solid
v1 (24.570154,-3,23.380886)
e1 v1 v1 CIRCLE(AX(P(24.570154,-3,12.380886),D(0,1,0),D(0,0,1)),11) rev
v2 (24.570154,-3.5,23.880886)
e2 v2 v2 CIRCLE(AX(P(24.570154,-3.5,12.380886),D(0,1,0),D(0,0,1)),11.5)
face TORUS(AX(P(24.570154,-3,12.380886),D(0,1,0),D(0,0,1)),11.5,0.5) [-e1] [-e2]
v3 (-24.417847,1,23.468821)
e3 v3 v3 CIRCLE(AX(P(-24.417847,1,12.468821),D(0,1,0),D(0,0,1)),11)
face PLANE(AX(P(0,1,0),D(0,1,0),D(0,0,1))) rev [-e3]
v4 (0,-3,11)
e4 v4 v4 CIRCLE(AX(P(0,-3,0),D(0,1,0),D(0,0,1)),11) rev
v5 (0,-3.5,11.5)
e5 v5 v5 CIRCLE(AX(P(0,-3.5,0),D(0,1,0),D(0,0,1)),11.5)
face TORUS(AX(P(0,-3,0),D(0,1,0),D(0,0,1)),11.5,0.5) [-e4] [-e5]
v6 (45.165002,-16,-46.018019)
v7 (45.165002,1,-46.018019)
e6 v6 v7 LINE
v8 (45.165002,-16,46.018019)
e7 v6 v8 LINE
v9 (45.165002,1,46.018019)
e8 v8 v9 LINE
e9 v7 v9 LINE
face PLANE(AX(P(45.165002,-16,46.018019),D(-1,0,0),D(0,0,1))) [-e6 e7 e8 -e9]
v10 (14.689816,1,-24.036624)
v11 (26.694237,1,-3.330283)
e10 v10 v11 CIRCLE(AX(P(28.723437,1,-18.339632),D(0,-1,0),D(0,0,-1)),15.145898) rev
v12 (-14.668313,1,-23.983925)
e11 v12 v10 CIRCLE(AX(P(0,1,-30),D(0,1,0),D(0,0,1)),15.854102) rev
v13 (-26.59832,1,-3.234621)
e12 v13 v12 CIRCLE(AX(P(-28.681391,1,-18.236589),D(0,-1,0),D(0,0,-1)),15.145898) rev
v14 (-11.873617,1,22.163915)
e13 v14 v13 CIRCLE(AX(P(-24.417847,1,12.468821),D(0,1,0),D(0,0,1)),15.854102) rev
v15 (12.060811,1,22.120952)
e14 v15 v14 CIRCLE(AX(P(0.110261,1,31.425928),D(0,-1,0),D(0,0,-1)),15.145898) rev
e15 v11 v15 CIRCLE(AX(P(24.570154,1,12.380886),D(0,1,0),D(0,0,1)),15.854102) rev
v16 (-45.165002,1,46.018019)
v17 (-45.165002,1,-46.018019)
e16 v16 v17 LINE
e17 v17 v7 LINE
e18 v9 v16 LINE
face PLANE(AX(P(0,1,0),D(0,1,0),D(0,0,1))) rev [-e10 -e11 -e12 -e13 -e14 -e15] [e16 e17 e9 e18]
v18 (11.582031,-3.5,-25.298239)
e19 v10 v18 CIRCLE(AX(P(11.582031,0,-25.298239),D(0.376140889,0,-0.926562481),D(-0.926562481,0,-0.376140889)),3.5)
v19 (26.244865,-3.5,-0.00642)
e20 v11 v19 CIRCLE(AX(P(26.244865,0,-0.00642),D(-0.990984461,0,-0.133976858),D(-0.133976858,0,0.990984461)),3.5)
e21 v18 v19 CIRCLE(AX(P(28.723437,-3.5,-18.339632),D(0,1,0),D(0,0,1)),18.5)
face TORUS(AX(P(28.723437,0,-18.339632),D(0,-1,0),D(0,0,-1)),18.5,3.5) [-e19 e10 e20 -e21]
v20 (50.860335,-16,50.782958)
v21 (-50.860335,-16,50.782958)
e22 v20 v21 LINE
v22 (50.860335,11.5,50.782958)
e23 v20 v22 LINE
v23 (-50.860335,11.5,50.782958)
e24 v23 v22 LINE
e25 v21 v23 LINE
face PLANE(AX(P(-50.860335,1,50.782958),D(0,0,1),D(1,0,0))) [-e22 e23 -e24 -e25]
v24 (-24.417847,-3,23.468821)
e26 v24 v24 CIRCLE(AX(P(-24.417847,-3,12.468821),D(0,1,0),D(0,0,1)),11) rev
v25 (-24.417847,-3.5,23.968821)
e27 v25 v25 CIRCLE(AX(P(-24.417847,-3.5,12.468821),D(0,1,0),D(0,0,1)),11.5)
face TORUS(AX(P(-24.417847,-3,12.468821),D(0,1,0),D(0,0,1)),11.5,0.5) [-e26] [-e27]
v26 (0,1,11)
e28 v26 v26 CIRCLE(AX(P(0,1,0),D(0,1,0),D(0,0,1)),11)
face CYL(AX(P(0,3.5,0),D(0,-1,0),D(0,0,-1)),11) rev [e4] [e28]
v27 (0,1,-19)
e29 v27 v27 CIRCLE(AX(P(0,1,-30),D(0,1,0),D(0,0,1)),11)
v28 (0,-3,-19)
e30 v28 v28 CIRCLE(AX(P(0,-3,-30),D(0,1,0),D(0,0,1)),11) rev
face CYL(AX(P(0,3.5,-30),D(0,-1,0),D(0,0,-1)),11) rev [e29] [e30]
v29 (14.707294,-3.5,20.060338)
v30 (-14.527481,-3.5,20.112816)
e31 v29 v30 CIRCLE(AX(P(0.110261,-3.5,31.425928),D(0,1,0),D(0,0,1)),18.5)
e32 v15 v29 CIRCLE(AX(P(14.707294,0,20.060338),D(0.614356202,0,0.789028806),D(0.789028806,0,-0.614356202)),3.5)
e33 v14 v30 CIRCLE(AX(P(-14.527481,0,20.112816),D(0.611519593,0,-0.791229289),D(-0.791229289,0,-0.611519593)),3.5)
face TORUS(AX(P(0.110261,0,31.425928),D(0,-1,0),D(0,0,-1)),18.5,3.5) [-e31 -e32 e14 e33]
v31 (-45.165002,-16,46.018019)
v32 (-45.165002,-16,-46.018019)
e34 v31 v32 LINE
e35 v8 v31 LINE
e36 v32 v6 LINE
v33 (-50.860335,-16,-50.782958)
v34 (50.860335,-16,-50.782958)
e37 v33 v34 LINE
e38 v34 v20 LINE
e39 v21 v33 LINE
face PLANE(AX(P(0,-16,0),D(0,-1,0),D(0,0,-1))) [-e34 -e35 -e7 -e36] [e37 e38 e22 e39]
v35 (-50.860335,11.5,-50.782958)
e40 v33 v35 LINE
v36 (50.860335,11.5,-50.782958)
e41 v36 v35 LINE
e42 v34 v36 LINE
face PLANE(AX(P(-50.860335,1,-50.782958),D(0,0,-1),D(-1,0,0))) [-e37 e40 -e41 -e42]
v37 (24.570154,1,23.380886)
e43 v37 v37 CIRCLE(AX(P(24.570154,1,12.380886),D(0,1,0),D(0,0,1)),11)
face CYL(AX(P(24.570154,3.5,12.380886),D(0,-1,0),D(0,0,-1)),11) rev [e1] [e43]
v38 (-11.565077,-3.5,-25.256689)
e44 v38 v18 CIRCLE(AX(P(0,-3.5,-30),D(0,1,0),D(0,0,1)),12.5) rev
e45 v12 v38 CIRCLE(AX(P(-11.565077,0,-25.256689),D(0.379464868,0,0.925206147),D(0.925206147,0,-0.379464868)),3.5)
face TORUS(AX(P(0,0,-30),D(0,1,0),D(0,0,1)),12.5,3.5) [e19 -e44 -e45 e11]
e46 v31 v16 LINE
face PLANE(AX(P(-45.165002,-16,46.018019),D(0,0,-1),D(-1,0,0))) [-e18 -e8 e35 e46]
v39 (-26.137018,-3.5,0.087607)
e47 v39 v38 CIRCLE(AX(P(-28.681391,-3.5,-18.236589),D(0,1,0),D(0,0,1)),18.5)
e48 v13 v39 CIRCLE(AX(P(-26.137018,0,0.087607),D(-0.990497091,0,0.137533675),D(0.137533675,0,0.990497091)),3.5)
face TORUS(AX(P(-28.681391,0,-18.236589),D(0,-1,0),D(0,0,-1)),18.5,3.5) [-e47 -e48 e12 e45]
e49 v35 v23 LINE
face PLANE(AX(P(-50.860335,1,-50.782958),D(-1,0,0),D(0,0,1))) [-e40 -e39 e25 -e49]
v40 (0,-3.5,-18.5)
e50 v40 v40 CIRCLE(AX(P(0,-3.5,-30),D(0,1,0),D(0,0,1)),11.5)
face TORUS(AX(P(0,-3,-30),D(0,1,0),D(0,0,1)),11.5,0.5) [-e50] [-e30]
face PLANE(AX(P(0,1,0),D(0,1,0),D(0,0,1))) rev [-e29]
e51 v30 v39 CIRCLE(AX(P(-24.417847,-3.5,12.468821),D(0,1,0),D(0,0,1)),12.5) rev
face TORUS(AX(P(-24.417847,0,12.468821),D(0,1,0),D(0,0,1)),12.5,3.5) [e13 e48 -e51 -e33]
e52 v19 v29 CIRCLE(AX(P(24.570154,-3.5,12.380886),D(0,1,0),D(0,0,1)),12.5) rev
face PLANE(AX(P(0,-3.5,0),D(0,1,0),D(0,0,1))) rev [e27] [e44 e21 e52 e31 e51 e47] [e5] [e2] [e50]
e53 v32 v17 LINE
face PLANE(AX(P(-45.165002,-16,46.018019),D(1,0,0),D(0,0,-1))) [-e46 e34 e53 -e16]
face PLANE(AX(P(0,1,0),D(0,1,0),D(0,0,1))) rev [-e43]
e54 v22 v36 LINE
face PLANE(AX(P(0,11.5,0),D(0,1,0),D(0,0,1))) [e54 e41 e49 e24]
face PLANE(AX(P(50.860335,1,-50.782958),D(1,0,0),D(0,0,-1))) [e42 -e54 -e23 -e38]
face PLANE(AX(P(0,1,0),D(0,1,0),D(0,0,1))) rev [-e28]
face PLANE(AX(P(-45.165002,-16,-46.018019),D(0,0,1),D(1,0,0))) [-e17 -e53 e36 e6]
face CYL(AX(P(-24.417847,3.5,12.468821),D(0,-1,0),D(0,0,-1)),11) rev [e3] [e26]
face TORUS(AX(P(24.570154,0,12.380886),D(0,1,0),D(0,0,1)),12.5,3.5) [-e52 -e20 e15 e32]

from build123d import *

# Parameters (mm, degrees)
SKETCH1_R                    = 11
SKETCH1_R_2                  = 16
BOSS_EXTRUDE1_DEPTH          = 3.5
FILLET1_R                    = 3.5
FILLET2_R                    = 0.5
FILLET3_R                    = 0.5
SALIENTE_EXTRUIR1_DEPTH      = 8
SALIENTE_EXTRUIR1_DEPTH_BACK = 2.5
CROQUIS1_W                   = 101.720670144
CROQUIS1_H                   = 101.56591671
CROQUIS2_W                   = 101.720670144
CROQUIS2_H                   = 101.56591671
CROQUIS2_W_2                 = 90.330003626
CROQUIS2_H_2                 = 92.036037492
SALIENTE_EXTRUIR2_DEPTH      = 17


with BuildPart() as part:
    # Sketch1 → Boss-Extrude1 (new, symmetric)
    # profile 1 of 4: a face of its own
    with BuildSketch(Plane(origin=(0, 0, 0), x_dir=(1, 0, 0), z_dir=(0, 1, 0))):
        with BuildLine():
            ThreePointArc((14.824999698, 23.981745772), (0.02872042, 14.000025777), (-14.803298349, 23.928562115))
            ThreePointArc((-14.803298349, 23.928562115), (-15.677567726, 10.759919254), (-26.618385425, 3.379132725))
            ThreePointArc((-26.618385425, 3.379132725), (-13.910911314, -0.402159626), (-8.417846624, -12.468820739))
            ThreePointArc((-8.417846624, -12.468820739), (-9.275939578, -17.638216355), (-11.758178003, -22.253134226))
            ThreePointArc((-11.758178003, -22.253134226), (0.083335936, -16.425952286), (11.94569342, -22.210585087))
            ThreePointArc((11.94569342, -22.210585087), (10.69940997, -4.405771353), (26.713784045, 3.474865521))
            ThreePointArc((26.713784045, 3.474865521), (15.746539483, 10.816326442), (14.824999698, 23.981745772))
        make_face()
        with Locations(Location((0, 0, 0), (0, 0, 270))):
            Circle(SKETCH1_R, mode=Mode.SUBTRACT)
    # profile 2 of 4: a face of its own
    with BuildSketch(Plane(origin=(0, 0, 0), x_dir=(1, 0, 0), z_dir=(0, 1, 0))):
        with Locations((-24.417846624, -12.468820739)):
            Circle(SKETCH1_R_2)
        with Locations(Location((-24.417846624, -12.468820739, 0), (0, 0, 270))):
            Circle(SKETCH1_R, mode=Mode.SUBTRACT)
    # profile 3 of 4: a face of its own
    with BuildSketch(Plane(origin=(0, 0, 0), x_dir=(1, 0, 0), z_dir=(0, 1, 0))):
        with Locations((24.570154317, -12.380885851)):
            Circle(SKETCH1_R_2)
        with Locations(Location((24.570154317, -12.380885851, 0), (0, 0, 270))):
            Circle(SKETCH1_R, mode=Mode.SUBTRACT)
    # profile 4 of 4: a face of its own
    with BuildSketch(Plane(origin=(0, 0, 0), x_dir=(1, 0, 0), z_dir=(0, 1, 0))):
        with Locations((0, 30)):
            Circle(SKETCH1_R_2)
        with Locations(Location((0, 30, 0), (0, 0, 270))):
            Circle(SKETCH1_R, mode=Mode.SUBTRACT)
    extrude(amount=BOSS_EXTRUDE1_DEPTH, both=True)

    # Fillet1
    fillet1_edges = [part.edges().sort_by_distance(p)[0] for p in [
        (-0.02872042, -3.5, -45.999974223),
        (-15.677567726, 3.5, -10.759919254),
        (15.746539483, -3.5, -10.816326442),
        (38.440898664, -3.5, 20.35600035),
        (0.083335936, -3.5, 16.425952286),
        (-38.259870551, -3.5, 20.493680463),
    ]]
    fillet(fillet1_edges, radius=FILLET1_R - 0.0001)  # a hair under: the kernel refuses the full size

    # Fillet2
    fillet2_edges = [part.edges().sort_by_distance(p)[0] for p in [
        (-24.417846624, -3.5, 1.468820739),
        (24.570154317, -3.5, 1.380885851),
        (0, -3.5, -41),
        (0, 3.5, -41),
        (24.570154317, 3.5, 1.380885851),
        (-24.417846624, 3.5, 1.468820739),
    ]]
    fillet(fillet2_edges, radius=FILLET2_R)

    # Fillet3
    fillet3_edges = [part.edges().sort_by_distance(p)[0] for p in [
        (0, -3.5, -11),
        (0, 3.5, -11),
    ]]
    fillet(fillet3_edges, radius=FILLET3_R)

    # Croquis1 → Saliente-Extruir1 (add, two sides: drawn at the far end of the back side and taken through both)
    with BuildSketch(Plane(origin=(0, 3.5, 0), x_dir=(1, 0, 0), z_dir=(0, 1, 0)).offset(-SALIENTE_EXTRUIR1_DEPTH_BACK)):
        Rectangle(CROQUIS1_W, CROQUIS1_H)
    extrude(amount=SALIENTE_EXTRUIR1_DEPTH + SALIENTE_EXTRUIR1_DEPTH_BACK)

    # Croquis2 → Saliente-Extruir2 (add)
    with BuildSketch(Plane.XZ.offset(-1)):
        Rectangle(CROQUIS2_W, CROQUIS2_H)
        Rectangle(CROQUIS2_W_2, CROQUIS2_H_2, mode=Mode.SUBTRACT)
    extrude(amount=SALIENTE_EXTRUIR2_DEPTH)


solid = part.part
